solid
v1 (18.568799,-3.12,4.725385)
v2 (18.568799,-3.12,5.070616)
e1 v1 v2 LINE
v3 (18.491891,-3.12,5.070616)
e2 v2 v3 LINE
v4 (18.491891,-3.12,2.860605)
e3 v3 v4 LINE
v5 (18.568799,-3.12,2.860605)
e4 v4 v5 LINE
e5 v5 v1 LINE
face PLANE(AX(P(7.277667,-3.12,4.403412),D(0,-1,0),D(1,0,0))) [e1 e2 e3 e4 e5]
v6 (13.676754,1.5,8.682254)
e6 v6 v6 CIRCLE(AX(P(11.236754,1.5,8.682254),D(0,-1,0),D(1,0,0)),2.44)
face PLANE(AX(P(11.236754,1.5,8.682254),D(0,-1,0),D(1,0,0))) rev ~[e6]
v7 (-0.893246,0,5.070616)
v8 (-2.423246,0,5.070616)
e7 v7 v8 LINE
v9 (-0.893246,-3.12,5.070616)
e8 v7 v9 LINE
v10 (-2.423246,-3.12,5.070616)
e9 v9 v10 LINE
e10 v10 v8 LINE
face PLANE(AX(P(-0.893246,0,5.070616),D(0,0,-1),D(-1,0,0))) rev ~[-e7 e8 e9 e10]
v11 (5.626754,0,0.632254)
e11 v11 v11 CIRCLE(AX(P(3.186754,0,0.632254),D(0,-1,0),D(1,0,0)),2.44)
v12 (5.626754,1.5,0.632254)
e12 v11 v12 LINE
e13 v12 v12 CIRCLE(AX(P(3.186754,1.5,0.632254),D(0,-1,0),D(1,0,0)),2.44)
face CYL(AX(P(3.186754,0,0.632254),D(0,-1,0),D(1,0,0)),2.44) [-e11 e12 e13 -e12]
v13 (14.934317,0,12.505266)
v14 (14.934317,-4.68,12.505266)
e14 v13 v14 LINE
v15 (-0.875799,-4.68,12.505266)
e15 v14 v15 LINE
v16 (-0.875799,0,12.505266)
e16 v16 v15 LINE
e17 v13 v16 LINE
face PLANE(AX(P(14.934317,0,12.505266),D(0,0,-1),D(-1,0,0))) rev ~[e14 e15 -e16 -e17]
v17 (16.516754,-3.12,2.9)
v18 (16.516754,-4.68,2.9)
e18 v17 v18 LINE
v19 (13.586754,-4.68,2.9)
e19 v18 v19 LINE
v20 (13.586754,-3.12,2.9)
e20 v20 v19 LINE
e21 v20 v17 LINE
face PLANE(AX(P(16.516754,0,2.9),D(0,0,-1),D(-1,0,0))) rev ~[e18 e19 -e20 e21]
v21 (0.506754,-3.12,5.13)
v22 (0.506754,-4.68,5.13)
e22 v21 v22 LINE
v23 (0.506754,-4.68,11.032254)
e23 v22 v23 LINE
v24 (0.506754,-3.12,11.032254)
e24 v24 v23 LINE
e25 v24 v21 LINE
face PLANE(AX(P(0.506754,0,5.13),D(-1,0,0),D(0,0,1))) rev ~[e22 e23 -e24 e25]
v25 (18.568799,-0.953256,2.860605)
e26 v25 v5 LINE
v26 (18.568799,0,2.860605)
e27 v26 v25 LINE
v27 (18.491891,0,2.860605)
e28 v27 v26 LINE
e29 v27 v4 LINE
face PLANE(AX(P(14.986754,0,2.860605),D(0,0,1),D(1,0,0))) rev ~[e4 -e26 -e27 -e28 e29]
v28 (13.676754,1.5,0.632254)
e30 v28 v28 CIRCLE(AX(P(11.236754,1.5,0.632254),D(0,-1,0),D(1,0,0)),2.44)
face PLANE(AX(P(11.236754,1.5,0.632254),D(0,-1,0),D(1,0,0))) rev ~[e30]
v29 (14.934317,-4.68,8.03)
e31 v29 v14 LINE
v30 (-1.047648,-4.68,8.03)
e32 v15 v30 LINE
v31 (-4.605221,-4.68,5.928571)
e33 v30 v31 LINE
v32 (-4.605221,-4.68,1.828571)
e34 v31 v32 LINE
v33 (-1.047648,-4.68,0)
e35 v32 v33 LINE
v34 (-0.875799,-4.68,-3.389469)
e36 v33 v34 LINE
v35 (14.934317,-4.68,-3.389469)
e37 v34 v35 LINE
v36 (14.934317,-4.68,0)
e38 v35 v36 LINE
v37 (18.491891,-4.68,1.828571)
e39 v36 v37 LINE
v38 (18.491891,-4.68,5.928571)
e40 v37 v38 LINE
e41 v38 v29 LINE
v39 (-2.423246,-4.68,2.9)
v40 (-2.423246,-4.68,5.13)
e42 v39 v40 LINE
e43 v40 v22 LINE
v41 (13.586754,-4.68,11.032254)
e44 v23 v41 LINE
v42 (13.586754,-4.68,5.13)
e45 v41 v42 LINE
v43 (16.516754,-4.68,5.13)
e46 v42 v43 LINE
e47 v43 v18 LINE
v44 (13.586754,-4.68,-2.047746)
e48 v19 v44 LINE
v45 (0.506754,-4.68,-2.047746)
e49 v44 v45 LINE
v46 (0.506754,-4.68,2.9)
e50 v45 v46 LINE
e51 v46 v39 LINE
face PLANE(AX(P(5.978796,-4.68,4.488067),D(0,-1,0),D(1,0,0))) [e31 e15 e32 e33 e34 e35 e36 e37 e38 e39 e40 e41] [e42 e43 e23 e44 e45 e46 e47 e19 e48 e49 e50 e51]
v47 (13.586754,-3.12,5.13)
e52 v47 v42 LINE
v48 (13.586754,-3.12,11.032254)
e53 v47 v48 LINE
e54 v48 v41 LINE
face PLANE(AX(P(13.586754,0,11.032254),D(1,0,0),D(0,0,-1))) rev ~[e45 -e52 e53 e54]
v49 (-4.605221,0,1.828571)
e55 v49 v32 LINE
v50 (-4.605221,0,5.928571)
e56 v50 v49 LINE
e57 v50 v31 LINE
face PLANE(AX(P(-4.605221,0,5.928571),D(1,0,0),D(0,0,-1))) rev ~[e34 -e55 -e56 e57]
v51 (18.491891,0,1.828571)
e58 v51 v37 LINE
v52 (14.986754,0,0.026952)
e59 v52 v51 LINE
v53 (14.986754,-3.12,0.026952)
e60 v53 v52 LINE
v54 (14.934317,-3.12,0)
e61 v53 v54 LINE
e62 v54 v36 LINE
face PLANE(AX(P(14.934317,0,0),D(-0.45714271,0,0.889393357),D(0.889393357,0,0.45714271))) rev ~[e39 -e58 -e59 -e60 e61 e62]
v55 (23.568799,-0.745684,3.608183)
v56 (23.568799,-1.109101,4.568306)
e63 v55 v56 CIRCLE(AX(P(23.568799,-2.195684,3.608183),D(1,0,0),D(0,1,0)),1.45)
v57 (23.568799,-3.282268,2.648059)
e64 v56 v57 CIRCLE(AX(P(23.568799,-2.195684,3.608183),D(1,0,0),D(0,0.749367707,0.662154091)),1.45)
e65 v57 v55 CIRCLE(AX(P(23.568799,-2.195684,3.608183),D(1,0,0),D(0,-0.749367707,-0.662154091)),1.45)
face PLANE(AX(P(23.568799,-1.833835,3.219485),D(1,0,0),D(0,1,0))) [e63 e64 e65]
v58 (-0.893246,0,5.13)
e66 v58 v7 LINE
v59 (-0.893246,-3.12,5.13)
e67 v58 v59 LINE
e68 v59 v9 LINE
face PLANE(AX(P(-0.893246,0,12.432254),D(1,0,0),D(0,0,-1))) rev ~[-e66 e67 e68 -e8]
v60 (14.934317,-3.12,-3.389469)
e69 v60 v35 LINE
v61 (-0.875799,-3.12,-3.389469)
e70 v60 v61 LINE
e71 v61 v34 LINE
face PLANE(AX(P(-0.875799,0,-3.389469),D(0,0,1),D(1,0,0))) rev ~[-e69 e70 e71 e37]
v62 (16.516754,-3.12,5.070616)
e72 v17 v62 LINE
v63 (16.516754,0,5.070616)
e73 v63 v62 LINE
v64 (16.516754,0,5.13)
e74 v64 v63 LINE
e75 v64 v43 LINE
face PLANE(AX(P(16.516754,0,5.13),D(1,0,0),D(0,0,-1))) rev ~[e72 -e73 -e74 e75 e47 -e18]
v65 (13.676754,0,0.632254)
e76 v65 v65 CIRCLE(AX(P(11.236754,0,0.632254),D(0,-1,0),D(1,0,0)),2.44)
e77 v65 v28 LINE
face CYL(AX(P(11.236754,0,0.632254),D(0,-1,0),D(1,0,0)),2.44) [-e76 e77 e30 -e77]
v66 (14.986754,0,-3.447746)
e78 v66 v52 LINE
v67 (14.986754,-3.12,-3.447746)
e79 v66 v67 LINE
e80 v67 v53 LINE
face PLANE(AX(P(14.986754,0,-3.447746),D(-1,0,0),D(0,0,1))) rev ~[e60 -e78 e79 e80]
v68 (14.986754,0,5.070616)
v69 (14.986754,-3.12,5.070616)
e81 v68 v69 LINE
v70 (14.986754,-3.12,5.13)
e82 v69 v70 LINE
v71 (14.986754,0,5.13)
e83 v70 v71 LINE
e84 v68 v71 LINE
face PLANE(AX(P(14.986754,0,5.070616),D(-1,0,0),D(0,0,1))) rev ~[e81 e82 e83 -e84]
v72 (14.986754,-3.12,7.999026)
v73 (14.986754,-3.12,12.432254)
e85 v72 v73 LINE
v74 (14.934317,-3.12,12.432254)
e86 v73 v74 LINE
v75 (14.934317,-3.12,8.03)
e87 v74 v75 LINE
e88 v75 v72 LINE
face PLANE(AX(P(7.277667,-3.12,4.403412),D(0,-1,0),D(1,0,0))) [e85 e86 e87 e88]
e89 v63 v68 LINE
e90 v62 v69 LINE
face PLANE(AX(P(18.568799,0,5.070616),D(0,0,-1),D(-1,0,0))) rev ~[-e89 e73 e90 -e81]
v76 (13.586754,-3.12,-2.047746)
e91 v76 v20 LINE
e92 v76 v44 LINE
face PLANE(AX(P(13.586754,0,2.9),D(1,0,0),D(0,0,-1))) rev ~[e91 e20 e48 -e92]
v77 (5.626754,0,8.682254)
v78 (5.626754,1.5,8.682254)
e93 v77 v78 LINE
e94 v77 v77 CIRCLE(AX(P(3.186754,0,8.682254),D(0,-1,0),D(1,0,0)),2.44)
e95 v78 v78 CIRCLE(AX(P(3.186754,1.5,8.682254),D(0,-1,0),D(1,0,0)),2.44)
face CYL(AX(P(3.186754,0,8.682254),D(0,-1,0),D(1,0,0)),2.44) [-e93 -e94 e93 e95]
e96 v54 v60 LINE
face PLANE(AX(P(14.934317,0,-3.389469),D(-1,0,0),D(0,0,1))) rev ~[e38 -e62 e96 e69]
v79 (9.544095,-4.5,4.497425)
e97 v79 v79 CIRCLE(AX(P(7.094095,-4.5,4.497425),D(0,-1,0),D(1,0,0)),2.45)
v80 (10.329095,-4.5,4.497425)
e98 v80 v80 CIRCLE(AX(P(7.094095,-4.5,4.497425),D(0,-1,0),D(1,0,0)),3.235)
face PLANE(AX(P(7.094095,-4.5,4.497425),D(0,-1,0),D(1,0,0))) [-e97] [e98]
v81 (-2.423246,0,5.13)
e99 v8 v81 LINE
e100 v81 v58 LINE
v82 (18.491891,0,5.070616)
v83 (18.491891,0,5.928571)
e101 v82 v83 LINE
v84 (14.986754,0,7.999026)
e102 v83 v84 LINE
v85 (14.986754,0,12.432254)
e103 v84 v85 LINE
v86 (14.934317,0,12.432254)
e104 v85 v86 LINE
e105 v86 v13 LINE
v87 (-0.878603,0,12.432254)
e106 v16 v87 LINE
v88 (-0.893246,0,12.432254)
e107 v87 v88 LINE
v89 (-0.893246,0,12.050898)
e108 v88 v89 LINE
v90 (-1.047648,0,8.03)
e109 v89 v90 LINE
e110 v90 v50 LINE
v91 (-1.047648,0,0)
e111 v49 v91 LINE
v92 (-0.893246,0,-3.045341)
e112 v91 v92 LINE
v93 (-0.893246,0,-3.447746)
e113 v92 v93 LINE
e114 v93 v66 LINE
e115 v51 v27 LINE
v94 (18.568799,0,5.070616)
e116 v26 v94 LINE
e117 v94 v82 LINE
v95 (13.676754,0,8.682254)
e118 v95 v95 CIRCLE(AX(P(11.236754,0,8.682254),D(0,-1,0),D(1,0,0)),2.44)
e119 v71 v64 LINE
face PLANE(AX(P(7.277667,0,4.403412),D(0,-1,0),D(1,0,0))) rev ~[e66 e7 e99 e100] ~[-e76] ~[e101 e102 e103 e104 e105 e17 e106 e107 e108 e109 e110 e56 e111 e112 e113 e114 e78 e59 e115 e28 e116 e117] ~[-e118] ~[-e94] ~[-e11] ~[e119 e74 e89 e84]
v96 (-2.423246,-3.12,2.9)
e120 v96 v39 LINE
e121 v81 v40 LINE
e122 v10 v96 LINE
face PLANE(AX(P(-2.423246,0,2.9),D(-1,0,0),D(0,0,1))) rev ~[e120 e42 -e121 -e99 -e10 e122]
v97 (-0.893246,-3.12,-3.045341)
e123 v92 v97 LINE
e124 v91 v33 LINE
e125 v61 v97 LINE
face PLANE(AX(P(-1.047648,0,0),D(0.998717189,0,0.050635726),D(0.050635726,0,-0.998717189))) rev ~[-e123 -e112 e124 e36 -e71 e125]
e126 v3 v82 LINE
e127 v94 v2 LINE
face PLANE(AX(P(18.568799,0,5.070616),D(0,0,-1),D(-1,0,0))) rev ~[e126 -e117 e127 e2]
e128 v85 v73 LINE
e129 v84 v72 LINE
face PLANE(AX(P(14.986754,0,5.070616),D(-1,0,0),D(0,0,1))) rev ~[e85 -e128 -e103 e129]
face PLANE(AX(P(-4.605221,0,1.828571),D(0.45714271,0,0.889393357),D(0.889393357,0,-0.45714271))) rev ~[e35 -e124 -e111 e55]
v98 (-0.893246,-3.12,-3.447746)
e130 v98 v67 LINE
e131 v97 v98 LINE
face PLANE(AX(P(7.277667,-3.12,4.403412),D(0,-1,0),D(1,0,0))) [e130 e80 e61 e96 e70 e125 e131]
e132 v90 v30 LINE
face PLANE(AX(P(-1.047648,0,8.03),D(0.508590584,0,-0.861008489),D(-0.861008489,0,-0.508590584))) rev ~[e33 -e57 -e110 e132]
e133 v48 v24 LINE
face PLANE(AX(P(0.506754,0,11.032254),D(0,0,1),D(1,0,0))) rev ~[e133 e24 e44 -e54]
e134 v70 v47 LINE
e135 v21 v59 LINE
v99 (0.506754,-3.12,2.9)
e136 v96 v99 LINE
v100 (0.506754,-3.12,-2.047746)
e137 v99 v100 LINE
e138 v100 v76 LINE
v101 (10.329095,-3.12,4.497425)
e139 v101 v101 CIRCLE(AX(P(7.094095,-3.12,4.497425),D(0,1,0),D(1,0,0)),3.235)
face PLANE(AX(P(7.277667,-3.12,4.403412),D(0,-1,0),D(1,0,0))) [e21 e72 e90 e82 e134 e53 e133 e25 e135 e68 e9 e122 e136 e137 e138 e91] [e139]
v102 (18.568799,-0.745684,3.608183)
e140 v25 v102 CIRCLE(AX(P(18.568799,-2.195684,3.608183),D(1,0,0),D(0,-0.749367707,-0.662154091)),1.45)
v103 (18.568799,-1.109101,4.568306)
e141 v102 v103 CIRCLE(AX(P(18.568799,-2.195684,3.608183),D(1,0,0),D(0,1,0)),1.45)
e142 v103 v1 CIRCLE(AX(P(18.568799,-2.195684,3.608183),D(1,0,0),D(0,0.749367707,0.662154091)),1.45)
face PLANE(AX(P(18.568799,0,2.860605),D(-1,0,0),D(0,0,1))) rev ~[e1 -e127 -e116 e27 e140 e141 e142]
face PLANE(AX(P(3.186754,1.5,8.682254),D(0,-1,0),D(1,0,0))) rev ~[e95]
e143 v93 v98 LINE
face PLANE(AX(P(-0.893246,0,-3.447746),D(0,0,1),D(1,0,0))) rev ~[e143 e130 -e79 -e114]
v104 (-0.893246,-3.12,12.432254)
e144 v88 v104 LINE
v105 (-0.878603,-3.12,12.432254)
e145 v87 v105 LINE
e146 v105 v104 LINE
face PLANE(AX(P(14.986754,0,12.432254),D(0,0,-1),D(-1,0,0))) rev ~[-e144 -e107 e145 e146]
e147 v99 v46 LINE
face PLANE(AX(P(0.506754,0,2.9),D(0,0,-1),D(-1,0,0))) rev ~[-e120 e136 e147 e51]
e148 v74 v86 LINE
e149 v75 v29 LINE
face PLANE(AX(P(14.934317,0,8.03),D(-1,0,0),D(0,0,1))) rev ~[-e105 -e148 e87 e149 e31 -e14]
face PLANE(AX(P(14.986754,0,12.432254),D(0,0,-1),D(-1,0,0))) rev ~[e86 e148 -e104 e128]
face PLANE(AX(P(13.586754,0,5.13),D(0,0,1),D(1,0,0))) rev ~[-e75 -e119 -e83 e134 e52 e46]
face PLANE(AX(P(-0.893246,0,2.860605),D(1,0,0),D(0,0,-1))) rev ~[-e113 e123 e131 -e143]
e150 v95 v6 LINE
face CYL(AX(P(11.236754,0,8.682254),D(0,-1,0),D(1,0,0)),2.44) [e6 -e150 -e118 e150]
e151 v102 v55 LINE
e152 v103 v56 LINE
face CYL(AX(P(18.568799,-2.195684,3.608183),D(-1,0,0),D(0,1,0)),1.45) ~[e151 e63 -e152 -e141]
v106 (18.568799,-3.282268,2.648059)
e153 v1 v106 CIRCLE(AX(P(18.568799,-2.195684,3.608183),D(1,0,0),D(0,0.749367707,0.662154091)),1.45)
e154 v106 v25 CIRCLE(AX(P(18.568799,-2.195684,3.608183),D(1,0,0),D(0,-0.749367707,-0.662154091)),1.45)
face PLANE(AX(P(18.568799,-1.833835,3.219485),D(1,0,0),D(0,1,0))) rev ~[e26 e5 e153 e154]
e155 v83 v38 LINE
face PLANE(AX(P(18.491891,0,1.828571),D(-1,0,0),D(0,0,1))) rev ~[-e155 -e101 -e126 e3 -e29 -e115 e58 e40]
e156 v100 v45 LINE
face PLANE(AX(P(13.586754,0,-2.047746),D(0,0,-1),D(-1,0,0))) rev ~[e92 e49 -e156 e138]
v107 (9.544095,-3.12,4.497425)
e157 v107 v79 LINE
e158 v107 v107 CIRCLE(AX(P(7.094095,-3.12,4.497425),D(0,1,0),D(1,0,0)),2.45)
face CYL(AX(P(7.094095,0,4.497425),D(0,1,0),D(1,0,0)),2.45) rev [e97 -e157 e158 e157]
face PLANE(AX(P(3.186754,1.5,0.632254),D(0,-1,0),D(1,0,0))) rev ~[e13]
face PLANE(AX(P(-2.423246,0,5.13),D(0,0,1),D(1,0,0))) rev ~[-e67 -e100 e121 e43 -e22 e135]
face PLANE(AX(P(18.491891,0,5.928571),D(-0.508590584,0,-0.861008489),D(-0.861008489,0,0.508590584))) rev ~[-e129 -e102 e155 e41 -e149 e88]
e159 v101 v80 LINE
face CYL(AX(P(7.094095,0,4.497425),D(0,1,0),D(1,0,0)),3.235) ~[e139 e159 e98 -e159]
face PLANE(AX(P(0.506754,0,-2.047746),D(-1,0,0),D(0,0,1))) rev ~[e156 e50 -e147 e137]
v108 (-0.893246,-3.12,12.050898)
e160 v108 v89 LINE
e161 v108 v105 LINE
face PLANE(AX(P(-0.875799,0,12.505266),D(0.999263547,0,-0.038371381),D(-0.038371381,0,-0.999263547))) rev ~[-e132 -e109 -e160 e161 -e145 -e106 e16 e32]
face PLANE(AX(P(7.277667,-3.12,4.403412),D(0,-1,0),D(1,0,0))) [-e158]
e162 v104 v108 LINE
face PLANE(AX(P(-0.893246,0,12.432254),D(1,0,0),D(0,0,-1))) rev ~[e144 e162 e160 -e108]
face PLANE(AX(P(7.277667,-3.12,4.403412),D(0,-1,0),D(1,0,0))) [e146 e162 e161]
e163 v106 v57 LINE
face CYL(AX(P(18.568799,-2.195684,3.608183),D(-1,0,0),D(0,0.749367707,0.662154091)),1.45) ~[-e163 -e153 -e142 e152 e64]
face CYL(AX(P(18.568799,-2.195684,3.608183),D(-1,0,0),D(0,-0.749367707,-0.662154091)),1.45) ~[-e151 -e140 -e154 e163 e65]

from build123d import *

# Parameters (mm, degrees)
F1_DEPTH = 3.12
F2_R     = 2.44
F3_DEPTH = 1.5
F5_DEPTH = 4.68
F6_R     = 3.235
F6_R_2   = 2.45
F7_DEPTH = 4.5
F9_DEPTH = 5


# Not quite as in the source:
# - the program builds the solid bodies; features that only make, move or delete a surface that nothing else refers to are left out


with BuildPart() as f1:
    # F0 (on Front) → F1 (new body)
    with BuildSketch(Plane.XZ):
        Polygon((14.9867535406, 12.4322535499), (-0.8932464594, 12.4322535499), (-0.8932464594, 5.6322535499), (-0.8932464594, 5.0706164911), (-3.7561513018, 5.0706164911), (-3.7561513018, 2.860605251), (-0.8932464594, 2.860605251), (-0.8932464594, -3.4477464501), (14.9867535406, -3.4477464501), (14.9867535406, 2.860605251), (18.5687988997, 2.860605251), (18.5687988997, 5.0706164911), (14.9867535406, 5.0706164911), (14.9867535406, 5.5522535499), align=None)
    extrude(amount=F1_DEPTH)

    # F2 (on Front) → F3 (join)
    with BuildSketch(Plane.XZ):
        with Locations((11.2367535406, 8.6822535499)):
            Circle(F2_R)
        with Locations((3.1867535406, 8.6822535499)):
            Circle(F2_R)
        with Locations((3.1867535406, 0.6322535499)):
            Circle(F2_R)
        with Locations((11.2367535406, 0.6322535499)):
            Circle(F2_R)
    extrude(amount=-F3_DEPTH)

    # F4 (on Front) → F5 (join)
    with BuildSketch(Plane.XZ):
        Polygon((0.5067535406, 5.13), (0.5067535406, 11.0322535499), (13.5867535406, 11.0322535499), (13.5867535406, 5.13), (14.9343172088, 5.13), (14.9343172088, 8.03), (14.9343172088, 12.5052658841), (-0.8757988689, 12.5052658841), (-1.0476475582, 8.03), (-4.6052209849, 5.9285708389), (-4.6052209849, 1.8285708389), (-1.0476475582, 0), (-0.8757988689, -3.3894693479), (14.9343172088, -3.3894693479), (14.9343172088, 0), (14.9343172088, 2.9), (13.5867535406, 2.9), (13.5867535406, -2.0477464501), (0.5067535406, -2.0477464501), (0.5067535406, 2.9), (-2.4232464594, 2.9), (-2.4232464594, 5.13), align=None)
        Polygon((14.9343172088, 8.03), (14.9343172088, 5.13), (16.5167535406, 5.13), (16.5167535406, 2.9), (14.9343172088, 2.9), (14.9343172088, 0), (18.4918906356, 1.8285708389), (18.4918906356, 5.9285708389), align=None)
    extrude(amount=F5_DEPTH)

    # F6 (on Front) → F7 (join)
    with BuildSketch(Plane.XZ):
        with Locations((7.094095153, 4.4974250309)):
            Circle(F6_R)
        with Locations((7.094095153, 4.4974250309)):
            Circle(F6_R_2, mode=Mode.SUBTRACT)
    extrude(amount=F7_DEPTH)

    # F8 (on face) → F9 (join)
    with BuildSketch(Plane.YZ.offset(18.5687988997)):
        with BuildLine():
            ThreePointArc((-0.7456844895, 3.608182552), (-0.8395787407, 4.1214828522), (-1.1091013145, 4.5683059836))
            Line((-1.1091013145, 4.5683059836), (-3.2822676645, 2.6480591205))
            ThreePointArc((-3.2822676645, 2.6480591205), (-1.6823841893, 2.2520768032), (-0.7456844895, 3.608182552))
        make_face()
        with BuildLine():
            Line((-3.2822676645, 2.6480591205), (-1.1091013145, 4.5683059836))
            ThreePointArc((-1.1091013145, 4.5683059836), (-3.1558079211, 4.694765727), (-3.2822676645, 2.6480591205))
        make_face()
    extrude(amount=F9_DEPTH)


solid = f1.part
